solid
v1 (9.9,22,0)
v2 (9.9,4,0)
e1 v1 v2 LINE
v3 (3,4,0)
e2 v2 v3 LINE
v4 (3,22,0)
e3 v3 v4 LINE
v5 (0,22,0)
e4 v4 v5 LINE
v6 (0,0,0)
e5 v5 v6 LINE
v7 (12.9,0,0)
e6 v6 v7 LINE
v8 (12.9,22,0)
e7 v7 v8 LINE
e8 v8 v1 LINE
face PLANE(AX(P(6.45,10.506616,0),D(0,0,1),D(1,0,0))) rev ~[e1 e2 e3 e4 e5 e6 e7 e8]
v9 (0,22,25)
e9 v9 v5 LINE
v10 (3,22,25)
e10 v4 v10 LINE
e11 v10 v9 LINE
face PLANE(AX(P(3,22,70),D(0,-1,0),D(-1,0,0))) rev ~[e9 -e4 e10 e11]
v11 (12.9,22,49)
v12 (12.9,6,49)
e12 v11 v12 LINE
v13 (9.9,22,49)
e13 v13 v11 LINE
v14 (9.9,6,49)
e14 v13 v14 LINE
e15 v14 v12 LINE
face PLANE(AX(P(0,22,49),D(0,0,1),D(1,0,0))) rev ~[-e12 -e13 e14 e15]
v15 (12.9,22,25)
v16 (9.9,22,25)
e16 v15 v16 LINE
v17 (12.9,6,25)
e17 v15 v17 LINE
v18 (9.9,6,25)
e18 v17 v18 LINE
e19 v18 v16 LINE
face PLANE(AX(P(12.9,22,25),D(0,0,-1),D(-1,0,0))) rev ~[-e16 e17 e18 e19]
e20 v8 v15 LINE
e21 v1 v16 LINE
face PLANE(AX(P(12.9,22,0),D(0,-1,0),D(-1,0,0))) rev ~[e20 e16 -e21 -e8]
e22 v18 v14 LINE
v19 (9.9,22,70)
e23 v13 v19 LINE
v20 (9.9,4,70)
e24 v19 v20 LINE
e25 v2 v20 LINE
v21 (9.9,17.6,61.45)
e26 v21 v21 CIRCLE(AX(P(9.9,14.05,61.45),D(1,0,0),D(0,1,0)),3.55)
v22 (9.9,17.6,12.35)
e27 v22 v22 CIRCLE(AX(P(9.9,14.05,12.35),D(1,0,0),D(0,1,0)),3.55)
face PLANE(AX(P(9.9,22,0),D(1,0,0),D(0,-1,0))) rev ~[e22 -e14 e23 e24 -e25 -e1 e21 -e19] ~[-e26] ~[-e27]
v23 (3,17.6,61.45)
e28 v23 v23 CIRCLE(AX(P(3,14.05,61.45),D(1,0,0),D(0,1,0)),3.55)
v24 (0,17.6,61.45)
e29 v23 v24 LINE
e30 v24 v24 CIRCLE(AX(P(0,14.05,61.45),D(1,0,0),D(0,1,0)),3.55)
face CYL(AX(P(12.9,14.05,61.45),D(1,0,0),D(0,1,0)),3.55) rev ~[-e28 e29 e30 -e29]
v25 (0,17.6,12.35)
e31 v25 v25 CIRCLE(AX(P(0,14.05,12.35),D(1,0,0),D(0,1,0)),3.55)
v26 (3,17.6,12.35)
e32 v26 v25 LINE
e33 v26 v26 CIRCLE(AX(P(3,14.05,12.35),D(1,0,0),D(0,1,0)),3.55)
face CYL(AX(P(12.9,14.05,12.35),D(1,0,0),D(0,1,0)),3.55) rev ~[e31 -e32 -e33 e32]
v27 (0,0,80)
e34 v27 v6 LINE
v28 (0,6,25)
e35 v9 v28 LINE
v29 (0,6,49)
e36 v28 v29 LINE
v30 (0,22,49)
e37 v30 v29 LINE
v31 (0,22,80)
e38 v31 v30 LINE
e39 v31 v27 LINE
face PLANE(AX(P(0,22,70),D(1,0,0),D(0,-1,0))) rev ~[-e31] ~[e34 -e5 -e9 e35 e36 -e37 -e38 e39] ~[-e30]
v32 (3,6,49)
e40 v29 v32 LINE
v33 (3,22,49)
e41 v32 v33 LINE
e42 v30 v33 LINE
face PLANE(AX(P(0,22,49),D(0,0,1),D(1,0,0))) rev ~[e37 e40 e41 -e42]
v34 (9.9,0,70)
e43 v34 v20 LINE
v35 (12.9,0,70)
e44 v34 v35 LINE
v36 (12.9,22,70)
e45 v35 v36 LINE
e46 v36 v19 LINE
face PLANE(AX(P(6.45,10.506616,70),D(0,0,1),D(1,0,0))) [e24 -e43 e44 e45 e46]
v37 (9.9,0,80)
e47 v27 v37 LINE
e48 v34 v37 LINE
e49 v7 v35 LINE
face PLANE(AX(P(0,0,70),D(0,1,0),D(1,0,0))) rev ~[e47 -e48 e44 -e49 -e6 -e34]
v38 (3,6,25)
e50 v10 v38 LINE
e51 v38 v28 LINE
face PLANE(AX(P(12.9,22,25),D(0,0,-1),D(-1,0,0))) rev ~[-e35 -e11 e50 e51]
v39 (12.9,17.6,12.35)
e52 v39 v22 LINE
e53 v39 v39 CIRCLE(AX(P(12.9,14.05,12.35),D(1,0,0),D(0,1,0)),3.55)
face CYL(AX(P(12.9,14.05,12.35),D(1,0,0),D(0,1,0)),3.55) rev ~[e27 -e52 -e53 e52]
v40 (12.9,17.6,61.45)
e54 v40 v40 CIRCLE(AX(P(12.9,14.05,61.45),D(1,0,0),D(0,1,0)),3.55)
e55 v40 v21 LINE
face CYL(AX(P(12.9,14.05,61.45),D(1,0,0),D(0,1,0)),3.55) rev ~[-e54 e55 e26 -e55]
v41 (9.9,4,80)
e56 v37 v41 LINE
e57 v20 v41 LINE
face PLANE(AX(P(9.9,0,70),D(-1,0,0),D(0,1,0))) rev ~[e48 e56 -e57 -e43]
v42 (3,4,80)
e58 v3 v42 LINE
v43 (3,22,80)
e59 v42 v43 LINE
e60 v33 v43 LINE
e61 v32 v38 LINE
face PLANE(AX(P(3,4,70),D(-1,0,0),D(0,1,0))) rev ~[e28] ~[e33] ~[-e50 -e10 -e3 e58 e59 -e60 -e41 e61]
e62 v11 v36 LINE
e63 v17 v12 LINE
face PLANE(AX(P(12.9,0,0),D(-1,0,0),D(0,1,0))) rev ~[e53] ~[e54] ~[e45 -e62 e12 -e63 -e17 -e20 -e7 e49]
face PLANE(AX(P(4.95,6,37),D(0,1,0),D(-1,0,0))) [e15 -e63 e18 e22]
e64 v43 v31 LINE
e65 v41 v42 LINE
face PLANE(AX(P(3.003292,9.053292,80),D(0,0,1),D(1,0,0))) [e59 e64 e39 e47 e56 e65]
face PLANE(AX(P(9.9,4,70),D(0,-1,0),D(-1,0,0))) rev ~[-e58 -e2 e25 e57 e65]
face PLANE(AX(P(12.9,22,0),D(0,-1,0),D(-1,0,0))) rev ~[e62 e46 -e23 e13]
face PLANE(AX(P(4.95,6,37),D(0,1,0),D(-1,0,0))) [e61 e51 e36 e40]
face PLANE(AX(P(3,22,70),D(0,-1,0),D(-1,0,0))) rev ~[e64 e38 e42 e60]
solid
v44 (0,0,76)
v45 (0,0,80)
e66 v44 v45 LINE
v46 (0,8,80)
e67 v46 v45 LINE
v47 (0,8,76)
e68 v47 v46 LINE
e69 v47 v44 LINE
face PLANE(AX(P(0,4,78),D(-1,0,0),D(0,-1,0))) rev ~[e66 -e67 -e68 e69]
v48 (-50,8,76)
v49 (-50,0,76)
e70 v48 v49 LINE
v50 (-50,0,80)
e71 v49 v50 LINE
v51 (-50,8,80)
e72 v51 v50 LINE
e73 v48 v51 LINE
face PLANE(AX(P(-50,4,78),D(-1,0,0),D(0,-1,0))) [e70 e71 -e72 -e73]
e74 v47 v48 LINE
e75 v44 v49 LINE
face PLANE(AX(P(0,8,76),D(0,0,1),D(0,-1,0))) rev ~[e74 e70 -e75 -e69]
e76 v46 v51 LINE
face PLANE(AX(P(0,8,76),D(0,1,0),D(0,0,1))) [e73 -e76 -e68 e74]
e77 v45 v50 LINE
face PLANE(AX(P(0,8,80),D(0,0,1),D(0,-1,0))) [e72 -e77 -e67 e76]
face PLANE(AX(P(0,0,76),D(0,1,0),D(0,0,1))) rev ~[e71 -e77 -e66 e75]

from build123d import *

# Parameters (mm, degrees)
F1_DEPTH = 70
F2_R     = 3.55
F3_DEPTH = 12.901
F5_DEPTH = 10
F6_W     = 8
F6_H     = 4
F7_DEPTH = 50
F8_W     = 9.9
F8_H     = 24
F8_W_2   = 3
F9_DEPTH = 16


# Not quite as in the source:
# - a feature names something its author has since deleted; it is built from what else it names


with BuildPart() as f1:
    # F0 (on Top) → F1 (new body)
    with BuildSketch(Plane.XY):
        Polygon((0, 22), (0, 0), (12.9, 0), (12.9, 22), (9.9, 22), (9.9, 4), (3, 4), (3, 22), align=None)
    extrude(amount=F1_DEPTH)

    # F2 (on face) → F3 (cut, through all)
    with BuildSketch(Plane.YZ.offset(12.9)):
        with Locations((14.05, 61.45)):
            Circle(F2_R)
        with Locations((14.05, 12.35)):
            Circle(F2_R)
    extrude(amount=-F3_DEPTH, mode=Mode.SUBTRACT)

    # F4 (on face) → F5 (join)
    with BuildSketch(Plane.XY.offset(70)):
        Polygon((9.9, 0), (9.9, 4), (3, 4), (3, 22), (0, 22), (0, 0), align=None)
    extrude(amount=F5_DEPTH)

    # F8 (on face) → F9 (cut)
    with BuildSketch(Plane(origin=(0, 22, 0), x_dir=(-1, 0, 0), z_dir=(0, 1, 0))):
        with Locations((-4.95, 37)):
            Rectangle(F8_W, F8_H)
        with Locations((-11.4, 37)):
            Rectangle(F8_W_2, F8_H)
    extrude(amount=-F9_DEPTH, mode=Mode.SUBTRACT)


with BuildPart() as f7:
    # F6 (on face) → F7 (new body)
    with BuildSketch(Plane(origin=(0, 0, 0), x_dir=(0, -1, 0), z_dir=(-1, 0, 0))):
        with Locations((-4, 78)):
            Rectangle(F6_W, F6_H)
    extrude(amount=F7_DEPTH)


solid = Compound([f1.part, f7.part])
